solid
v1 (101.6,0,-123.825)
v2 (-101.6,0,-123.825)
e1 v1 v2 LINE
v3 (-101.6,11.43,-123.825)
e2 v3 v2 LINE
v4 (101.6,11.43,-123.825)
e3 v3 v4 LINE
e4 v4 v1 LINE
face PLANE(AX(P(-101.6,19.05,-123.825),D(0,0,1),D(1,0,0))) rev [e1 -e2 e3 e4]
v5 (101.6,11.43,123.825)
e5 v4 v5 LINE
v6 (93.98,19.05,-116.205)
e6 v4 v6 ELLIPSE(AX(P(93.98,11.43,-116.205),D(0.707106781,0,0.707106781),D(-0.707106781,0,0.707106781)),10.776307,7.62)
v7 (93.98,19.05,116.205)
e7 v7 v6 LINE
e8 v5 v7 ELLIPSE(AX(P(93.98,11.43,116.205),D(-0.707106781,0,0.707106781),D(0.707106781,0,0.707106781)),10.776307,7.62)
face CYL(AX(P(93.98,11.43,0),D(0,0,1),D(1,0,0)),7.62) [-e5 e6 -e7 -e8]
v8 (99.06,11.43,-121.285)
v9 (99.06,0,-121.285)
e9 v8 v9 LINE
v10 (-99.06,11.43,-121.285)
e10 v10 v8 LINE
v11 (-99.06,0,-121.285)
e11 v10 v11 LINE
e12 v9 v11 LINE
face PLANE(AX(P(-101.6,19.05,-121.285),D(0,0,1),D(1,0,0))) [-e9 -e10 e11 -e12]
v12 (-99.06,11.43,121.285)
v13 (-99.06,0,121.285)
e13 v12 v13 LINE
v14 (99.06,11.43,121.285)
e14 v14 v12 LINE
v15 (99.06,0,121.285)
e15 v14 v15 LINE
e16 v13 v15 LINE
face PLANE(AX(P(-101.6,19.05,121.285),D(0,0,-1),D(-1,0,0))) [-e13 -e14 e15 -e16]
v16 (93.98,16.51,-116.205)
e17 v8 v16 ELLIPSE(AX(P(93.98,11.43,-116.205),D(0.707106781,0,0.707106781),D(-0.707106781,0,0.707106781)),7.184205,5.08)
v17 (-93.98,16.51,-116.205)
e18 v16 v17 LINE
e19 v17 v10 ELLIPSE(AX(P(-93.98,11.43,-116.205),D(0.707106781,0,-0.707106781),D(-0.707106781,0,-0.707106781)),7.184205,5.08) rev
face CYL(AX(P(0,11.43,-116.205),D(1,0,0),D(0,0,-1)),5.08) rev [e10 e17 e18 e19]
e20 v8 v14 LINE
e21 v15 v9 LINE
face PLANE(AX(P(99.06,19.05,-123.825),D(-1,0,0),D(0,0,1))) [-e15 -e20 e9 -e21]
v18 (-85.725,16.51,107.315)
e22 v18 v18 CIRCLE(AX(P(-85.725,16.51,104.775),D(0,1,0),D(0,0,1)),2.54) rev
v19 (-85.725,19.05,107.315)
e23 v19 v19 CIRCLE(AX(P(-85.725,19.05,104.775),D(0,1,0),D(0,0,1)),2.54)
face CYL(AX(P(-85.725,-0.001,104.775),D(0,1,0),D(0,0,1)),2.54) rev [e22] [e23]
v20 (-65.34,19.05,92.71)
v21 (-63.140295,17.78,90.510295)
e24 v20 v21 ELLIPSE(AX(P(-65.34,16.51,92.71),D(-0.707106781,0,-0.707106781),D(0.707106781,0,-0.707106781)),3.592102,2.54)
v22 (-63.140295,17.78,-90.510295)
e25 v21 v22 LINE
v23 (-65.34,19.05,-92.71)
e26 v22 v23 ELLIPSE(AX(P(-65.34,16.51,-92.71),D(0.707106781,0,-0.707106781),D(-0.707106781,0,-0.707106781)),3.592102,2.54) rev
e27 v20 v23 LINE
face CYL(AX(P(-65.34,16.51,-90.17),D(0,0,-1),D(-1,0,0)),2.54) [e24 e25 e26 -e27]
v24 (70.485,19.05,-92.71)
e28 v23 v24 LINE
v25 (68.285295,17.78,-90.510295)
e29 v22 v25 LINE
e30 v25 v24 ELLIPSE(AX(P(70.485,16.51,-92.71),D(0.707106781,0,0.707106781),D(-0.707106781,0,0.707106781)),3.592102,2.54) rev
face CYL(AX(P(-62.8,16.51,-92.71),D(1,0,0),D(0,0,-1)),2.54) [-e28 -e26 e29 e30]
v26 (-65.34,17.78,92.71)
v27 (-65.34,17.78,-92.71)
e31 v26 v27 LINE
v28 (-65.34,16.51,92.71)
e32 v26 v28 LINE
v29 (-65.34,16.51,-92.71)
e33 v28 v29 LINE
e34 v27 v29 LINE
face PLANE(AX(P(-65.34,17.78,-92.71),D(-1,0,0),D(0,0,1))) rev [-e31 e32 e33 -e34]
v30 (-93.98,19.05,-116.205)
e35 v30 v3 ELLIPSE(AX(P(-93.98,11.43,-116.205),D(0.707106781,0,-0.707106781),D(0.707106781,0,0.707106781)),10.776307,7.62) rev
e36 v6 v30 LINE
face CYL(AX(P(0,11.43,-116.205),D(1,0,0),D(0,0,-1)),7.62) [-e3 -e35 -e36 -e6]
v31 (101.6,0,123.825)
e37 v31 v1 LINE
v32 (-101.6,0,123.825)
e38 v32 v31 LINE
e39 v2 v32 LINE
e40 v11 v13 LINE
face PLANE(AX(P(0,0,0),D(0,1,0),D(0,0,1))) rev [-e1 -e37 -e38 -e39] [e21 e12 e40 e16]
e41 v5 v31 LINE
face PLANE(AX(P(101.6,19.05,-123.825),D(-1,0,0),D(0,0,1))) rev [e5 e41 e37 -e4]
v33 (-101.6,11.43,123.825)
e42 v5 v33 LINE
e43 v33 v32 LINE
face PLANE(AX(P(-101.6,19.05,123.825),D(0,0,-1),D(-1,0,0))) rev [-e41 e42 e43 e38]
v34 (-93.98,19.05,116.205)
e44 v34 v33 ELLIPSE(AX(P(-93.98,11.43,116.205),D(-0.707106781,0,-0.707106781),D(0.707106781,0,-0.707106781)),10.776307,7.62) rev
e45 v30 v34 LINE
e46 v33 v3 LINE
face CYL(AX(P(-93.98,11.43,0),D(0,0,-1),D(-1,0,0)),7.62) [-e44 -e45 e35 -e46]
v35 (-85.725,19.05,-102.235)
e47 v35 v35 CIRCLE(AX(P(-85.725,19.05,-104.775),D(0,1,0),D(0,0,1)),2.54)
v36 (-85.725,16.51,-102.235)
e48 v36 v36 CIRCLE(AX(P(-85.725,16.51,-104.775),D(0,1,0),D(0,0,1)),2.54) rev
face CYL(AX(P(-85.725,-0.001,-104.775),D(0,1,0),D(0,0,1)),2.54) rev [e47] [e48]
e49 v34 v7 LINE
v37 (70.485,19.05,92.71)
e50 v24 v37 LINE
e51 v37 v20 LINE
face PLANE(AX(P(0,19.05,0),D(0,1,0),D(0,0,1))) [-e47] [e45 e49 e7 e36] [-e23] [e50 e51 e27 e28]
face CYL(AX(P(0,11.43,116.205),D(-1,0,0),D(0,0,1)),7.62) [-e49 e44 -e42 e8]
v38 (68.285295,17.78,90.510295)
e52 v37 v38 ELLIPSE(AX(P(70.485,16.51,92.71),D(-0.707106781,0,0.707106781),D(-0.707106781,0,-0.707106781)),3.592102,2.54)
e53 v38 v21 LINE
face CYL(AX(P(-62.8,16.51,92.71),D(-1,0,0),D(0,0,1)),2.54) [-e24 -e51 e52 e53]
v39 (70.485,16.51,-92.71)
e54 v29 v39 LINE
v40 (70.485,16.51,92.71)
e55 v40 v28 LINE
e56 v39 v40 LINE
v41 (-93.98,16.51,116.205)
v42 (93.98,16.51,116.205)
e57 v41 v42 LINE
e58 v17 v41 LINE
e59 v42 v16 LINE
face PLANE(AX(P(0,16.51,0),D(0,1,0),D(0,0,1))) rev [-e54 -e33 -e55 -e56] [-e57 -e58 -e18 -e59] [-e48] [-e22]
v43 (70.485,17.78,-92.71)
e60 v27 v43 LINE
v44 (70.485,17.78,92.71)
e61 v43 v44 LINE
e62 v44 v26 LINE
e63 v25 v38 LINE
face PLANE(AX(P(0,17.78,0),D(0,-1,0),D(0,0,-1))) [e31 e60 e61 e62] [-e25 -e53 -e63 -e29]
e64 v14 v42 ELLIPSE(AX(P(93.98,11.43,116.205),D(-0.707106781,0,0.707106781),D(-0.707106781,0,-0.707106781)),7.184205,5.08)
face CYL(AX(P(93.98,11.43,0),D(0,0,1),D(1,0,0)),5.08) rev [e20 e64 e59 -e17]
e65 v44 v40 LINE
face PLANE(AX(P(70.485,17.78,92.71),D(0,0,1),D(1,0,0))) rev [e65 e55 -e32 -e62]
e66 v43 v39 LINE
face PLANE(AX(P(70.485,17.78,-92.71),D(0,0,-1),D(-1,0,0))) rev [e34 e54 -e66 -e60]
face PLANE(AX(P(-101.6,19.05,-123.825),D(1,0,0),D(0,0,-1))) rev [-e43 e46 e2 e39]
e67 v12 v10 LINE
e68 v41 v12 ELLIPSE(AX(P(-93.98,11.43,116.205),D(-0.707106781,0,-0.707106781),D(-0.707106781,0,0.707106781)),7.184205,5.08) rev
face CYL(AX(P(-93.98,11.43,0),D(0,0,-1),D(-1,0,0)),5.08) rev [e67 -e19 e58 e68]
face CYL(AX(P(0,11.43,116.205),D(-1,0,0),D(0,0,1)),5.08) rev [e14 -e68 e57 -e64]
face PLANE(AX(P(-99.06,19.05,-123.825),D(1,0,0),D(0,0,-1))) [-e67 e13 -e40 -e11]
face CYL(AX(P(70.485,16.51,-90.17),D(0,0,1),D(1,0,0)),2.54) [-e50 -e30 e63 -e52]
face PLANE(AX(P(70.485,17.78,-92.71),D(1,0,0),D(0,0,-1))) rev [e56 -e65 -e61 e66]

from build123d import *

# Parameters (mm, degrees)
SKETCH1_W           = 203.2
SKETCH1_H           = 247.65
BOSS_EXTRUDE1_DEPTH = 19.05
FILLET1_R           = 7.62
SHELL1_T            = -2.54
CUT_EXTRUDE1_REACH  = 163.301
SKETCH2_W           = 130.745
SKETCH2_H           = 180.34
FILLET2_R           = 2.54
CUT_EXTRUDE2_REACH  = 163.301
SKETCH3_R           = 2.54
SKETCH4_W           = 135.825
SKETCH4_H           = 185.42
CUT_EXTRUDE3_DEPTH  = 1.27


with BuildPart() as part:
    # Sketch1 → Boss-Extrude1 (new body)
    with BuildSketch(Plane(origin=(0, 0, 0), x_dir=(1, 0, 0), z_dir=(0, 1, 0))):
        Rectangle(SKETCH1_W, SKETCH1_H)
    extrude(amount=BOSS_EXTRUDE1_DEPTH)

    # Fillet1
    fillet1_edges = [part.edges().sort_by_distance(p)[0] for p in [
        (-101.6, 19.05, 0),
        (0, 19.05, 123.825),
        (101.6, 19.05, 0),
        (0, 19.05, -123.825),
    ]]
    fillet(fillet1_edges, radius=FILLET1_R)

    # Shell1
    shell1_openings = [part.faces().sort_by_distance(p)[0] for p in [
        (0, 0, 0),
    ]]
    offset(amount=SHELL1_T, openings=shell1_openings)

    # Sketch2 → Cut-Extrude1 (cut, up to next)
    with BuildSketch(Plane(origin=(0, 19.05, 0), x_dir=(1, 0, 0), z_dir=(0, 1, 0)), mode=Mode.PRIVATE) as cut_extrude1_sk1:
        with Locations((2.5725, 0)):
            Rectangle(SKETCH2_W, SKETCH2_H)
    cut_extrude1_tool1 = extrude(cut_extrude1_sk1.sketch, amount=-CUT_EXTRUDE1_REACH, mode=Mode.PRIVATE) & part.part
    add(cut_extrude1_tool1.solids().sort_by_distance((2.5725, 19.05, 0))[0], mode=Mode.SUBTRACT)

    # Fillet2
    fillet2_edges = [part.edges().sort_by_distance(p)[0] for p in [
        (-62.8, 19.05, 0),
        (2.5725, 19.05, 90.17),
        (67.945, 19.05, 0),
        (2.5725, 19.05, -90.17),
    ]]
    fillet(fillet2_edges, radius=FILLET2_R - 0.0001)  # a hair under: the kernel refuses the full size

    # Sketch3 → Cut-Extrude2 (cut, up to next)
    with BuildSketch(Plane(origin=(0, 19.05, 0), x_dir=(1, 0, 0), z_dir=(0, 1, 0)), mode=Mode.PRIVATE) as cut_extrude2_sk1:
        with Locations(Location((-85.725, 104.775, 0), (0, 0, 270))):
            Circle(SKETCH3_R)
    cut_extrude2_tool1 = extrude(cut_extrude2_sk1.sketch, amount=-CUT_EXTRUDE2_REACH, mode=Mode.PRIVATE) & part.part
    # Sketch3 → Cut-Extrude2 (cut, up to next)
    with BuildSketch(Plane(origin=(0, 19.05, 0), x_dir=(1, 0, 0), z_dir=(0, 1, 0)), mode=Mode.PRIVATE) as cut_extrude2_sk2:
        with Locations(Location((-85.725, -104.775, 0), (0, 0, 270))):
            Circle(SKETCH3_R)
    cut_extrude2_tool2 = extrude(cut_extrude2_sk2.sketch, amount=-CUT_EXTRUDE2_REACH, mode=Mode.PRIVATE) & part.part
    add(cut_extrude2_tool1.solids().sort_by_distance((-85.725, 19.05, -104.775))[0], mode=Mode.SUBTRACT)
    add(cut_extrude2_tool2.solids().sort_by_distance((-85.725, 19.05, 104.775))[0], mode=Mode.SUBTRACT)

    # Sketch4 → Cut-Extrude3 (cut)
    with BuildSketch(Plane.XZ.offset(-16.51)):
        with Locations((2.5725, 0)):
            Rectangle(SKETCH4_W, SKETCH4_H)
    extrude(amount=-CUT_EXTRUDE3_DEPTH, mode=Mode.SUBTRACT)


solid = part.part
